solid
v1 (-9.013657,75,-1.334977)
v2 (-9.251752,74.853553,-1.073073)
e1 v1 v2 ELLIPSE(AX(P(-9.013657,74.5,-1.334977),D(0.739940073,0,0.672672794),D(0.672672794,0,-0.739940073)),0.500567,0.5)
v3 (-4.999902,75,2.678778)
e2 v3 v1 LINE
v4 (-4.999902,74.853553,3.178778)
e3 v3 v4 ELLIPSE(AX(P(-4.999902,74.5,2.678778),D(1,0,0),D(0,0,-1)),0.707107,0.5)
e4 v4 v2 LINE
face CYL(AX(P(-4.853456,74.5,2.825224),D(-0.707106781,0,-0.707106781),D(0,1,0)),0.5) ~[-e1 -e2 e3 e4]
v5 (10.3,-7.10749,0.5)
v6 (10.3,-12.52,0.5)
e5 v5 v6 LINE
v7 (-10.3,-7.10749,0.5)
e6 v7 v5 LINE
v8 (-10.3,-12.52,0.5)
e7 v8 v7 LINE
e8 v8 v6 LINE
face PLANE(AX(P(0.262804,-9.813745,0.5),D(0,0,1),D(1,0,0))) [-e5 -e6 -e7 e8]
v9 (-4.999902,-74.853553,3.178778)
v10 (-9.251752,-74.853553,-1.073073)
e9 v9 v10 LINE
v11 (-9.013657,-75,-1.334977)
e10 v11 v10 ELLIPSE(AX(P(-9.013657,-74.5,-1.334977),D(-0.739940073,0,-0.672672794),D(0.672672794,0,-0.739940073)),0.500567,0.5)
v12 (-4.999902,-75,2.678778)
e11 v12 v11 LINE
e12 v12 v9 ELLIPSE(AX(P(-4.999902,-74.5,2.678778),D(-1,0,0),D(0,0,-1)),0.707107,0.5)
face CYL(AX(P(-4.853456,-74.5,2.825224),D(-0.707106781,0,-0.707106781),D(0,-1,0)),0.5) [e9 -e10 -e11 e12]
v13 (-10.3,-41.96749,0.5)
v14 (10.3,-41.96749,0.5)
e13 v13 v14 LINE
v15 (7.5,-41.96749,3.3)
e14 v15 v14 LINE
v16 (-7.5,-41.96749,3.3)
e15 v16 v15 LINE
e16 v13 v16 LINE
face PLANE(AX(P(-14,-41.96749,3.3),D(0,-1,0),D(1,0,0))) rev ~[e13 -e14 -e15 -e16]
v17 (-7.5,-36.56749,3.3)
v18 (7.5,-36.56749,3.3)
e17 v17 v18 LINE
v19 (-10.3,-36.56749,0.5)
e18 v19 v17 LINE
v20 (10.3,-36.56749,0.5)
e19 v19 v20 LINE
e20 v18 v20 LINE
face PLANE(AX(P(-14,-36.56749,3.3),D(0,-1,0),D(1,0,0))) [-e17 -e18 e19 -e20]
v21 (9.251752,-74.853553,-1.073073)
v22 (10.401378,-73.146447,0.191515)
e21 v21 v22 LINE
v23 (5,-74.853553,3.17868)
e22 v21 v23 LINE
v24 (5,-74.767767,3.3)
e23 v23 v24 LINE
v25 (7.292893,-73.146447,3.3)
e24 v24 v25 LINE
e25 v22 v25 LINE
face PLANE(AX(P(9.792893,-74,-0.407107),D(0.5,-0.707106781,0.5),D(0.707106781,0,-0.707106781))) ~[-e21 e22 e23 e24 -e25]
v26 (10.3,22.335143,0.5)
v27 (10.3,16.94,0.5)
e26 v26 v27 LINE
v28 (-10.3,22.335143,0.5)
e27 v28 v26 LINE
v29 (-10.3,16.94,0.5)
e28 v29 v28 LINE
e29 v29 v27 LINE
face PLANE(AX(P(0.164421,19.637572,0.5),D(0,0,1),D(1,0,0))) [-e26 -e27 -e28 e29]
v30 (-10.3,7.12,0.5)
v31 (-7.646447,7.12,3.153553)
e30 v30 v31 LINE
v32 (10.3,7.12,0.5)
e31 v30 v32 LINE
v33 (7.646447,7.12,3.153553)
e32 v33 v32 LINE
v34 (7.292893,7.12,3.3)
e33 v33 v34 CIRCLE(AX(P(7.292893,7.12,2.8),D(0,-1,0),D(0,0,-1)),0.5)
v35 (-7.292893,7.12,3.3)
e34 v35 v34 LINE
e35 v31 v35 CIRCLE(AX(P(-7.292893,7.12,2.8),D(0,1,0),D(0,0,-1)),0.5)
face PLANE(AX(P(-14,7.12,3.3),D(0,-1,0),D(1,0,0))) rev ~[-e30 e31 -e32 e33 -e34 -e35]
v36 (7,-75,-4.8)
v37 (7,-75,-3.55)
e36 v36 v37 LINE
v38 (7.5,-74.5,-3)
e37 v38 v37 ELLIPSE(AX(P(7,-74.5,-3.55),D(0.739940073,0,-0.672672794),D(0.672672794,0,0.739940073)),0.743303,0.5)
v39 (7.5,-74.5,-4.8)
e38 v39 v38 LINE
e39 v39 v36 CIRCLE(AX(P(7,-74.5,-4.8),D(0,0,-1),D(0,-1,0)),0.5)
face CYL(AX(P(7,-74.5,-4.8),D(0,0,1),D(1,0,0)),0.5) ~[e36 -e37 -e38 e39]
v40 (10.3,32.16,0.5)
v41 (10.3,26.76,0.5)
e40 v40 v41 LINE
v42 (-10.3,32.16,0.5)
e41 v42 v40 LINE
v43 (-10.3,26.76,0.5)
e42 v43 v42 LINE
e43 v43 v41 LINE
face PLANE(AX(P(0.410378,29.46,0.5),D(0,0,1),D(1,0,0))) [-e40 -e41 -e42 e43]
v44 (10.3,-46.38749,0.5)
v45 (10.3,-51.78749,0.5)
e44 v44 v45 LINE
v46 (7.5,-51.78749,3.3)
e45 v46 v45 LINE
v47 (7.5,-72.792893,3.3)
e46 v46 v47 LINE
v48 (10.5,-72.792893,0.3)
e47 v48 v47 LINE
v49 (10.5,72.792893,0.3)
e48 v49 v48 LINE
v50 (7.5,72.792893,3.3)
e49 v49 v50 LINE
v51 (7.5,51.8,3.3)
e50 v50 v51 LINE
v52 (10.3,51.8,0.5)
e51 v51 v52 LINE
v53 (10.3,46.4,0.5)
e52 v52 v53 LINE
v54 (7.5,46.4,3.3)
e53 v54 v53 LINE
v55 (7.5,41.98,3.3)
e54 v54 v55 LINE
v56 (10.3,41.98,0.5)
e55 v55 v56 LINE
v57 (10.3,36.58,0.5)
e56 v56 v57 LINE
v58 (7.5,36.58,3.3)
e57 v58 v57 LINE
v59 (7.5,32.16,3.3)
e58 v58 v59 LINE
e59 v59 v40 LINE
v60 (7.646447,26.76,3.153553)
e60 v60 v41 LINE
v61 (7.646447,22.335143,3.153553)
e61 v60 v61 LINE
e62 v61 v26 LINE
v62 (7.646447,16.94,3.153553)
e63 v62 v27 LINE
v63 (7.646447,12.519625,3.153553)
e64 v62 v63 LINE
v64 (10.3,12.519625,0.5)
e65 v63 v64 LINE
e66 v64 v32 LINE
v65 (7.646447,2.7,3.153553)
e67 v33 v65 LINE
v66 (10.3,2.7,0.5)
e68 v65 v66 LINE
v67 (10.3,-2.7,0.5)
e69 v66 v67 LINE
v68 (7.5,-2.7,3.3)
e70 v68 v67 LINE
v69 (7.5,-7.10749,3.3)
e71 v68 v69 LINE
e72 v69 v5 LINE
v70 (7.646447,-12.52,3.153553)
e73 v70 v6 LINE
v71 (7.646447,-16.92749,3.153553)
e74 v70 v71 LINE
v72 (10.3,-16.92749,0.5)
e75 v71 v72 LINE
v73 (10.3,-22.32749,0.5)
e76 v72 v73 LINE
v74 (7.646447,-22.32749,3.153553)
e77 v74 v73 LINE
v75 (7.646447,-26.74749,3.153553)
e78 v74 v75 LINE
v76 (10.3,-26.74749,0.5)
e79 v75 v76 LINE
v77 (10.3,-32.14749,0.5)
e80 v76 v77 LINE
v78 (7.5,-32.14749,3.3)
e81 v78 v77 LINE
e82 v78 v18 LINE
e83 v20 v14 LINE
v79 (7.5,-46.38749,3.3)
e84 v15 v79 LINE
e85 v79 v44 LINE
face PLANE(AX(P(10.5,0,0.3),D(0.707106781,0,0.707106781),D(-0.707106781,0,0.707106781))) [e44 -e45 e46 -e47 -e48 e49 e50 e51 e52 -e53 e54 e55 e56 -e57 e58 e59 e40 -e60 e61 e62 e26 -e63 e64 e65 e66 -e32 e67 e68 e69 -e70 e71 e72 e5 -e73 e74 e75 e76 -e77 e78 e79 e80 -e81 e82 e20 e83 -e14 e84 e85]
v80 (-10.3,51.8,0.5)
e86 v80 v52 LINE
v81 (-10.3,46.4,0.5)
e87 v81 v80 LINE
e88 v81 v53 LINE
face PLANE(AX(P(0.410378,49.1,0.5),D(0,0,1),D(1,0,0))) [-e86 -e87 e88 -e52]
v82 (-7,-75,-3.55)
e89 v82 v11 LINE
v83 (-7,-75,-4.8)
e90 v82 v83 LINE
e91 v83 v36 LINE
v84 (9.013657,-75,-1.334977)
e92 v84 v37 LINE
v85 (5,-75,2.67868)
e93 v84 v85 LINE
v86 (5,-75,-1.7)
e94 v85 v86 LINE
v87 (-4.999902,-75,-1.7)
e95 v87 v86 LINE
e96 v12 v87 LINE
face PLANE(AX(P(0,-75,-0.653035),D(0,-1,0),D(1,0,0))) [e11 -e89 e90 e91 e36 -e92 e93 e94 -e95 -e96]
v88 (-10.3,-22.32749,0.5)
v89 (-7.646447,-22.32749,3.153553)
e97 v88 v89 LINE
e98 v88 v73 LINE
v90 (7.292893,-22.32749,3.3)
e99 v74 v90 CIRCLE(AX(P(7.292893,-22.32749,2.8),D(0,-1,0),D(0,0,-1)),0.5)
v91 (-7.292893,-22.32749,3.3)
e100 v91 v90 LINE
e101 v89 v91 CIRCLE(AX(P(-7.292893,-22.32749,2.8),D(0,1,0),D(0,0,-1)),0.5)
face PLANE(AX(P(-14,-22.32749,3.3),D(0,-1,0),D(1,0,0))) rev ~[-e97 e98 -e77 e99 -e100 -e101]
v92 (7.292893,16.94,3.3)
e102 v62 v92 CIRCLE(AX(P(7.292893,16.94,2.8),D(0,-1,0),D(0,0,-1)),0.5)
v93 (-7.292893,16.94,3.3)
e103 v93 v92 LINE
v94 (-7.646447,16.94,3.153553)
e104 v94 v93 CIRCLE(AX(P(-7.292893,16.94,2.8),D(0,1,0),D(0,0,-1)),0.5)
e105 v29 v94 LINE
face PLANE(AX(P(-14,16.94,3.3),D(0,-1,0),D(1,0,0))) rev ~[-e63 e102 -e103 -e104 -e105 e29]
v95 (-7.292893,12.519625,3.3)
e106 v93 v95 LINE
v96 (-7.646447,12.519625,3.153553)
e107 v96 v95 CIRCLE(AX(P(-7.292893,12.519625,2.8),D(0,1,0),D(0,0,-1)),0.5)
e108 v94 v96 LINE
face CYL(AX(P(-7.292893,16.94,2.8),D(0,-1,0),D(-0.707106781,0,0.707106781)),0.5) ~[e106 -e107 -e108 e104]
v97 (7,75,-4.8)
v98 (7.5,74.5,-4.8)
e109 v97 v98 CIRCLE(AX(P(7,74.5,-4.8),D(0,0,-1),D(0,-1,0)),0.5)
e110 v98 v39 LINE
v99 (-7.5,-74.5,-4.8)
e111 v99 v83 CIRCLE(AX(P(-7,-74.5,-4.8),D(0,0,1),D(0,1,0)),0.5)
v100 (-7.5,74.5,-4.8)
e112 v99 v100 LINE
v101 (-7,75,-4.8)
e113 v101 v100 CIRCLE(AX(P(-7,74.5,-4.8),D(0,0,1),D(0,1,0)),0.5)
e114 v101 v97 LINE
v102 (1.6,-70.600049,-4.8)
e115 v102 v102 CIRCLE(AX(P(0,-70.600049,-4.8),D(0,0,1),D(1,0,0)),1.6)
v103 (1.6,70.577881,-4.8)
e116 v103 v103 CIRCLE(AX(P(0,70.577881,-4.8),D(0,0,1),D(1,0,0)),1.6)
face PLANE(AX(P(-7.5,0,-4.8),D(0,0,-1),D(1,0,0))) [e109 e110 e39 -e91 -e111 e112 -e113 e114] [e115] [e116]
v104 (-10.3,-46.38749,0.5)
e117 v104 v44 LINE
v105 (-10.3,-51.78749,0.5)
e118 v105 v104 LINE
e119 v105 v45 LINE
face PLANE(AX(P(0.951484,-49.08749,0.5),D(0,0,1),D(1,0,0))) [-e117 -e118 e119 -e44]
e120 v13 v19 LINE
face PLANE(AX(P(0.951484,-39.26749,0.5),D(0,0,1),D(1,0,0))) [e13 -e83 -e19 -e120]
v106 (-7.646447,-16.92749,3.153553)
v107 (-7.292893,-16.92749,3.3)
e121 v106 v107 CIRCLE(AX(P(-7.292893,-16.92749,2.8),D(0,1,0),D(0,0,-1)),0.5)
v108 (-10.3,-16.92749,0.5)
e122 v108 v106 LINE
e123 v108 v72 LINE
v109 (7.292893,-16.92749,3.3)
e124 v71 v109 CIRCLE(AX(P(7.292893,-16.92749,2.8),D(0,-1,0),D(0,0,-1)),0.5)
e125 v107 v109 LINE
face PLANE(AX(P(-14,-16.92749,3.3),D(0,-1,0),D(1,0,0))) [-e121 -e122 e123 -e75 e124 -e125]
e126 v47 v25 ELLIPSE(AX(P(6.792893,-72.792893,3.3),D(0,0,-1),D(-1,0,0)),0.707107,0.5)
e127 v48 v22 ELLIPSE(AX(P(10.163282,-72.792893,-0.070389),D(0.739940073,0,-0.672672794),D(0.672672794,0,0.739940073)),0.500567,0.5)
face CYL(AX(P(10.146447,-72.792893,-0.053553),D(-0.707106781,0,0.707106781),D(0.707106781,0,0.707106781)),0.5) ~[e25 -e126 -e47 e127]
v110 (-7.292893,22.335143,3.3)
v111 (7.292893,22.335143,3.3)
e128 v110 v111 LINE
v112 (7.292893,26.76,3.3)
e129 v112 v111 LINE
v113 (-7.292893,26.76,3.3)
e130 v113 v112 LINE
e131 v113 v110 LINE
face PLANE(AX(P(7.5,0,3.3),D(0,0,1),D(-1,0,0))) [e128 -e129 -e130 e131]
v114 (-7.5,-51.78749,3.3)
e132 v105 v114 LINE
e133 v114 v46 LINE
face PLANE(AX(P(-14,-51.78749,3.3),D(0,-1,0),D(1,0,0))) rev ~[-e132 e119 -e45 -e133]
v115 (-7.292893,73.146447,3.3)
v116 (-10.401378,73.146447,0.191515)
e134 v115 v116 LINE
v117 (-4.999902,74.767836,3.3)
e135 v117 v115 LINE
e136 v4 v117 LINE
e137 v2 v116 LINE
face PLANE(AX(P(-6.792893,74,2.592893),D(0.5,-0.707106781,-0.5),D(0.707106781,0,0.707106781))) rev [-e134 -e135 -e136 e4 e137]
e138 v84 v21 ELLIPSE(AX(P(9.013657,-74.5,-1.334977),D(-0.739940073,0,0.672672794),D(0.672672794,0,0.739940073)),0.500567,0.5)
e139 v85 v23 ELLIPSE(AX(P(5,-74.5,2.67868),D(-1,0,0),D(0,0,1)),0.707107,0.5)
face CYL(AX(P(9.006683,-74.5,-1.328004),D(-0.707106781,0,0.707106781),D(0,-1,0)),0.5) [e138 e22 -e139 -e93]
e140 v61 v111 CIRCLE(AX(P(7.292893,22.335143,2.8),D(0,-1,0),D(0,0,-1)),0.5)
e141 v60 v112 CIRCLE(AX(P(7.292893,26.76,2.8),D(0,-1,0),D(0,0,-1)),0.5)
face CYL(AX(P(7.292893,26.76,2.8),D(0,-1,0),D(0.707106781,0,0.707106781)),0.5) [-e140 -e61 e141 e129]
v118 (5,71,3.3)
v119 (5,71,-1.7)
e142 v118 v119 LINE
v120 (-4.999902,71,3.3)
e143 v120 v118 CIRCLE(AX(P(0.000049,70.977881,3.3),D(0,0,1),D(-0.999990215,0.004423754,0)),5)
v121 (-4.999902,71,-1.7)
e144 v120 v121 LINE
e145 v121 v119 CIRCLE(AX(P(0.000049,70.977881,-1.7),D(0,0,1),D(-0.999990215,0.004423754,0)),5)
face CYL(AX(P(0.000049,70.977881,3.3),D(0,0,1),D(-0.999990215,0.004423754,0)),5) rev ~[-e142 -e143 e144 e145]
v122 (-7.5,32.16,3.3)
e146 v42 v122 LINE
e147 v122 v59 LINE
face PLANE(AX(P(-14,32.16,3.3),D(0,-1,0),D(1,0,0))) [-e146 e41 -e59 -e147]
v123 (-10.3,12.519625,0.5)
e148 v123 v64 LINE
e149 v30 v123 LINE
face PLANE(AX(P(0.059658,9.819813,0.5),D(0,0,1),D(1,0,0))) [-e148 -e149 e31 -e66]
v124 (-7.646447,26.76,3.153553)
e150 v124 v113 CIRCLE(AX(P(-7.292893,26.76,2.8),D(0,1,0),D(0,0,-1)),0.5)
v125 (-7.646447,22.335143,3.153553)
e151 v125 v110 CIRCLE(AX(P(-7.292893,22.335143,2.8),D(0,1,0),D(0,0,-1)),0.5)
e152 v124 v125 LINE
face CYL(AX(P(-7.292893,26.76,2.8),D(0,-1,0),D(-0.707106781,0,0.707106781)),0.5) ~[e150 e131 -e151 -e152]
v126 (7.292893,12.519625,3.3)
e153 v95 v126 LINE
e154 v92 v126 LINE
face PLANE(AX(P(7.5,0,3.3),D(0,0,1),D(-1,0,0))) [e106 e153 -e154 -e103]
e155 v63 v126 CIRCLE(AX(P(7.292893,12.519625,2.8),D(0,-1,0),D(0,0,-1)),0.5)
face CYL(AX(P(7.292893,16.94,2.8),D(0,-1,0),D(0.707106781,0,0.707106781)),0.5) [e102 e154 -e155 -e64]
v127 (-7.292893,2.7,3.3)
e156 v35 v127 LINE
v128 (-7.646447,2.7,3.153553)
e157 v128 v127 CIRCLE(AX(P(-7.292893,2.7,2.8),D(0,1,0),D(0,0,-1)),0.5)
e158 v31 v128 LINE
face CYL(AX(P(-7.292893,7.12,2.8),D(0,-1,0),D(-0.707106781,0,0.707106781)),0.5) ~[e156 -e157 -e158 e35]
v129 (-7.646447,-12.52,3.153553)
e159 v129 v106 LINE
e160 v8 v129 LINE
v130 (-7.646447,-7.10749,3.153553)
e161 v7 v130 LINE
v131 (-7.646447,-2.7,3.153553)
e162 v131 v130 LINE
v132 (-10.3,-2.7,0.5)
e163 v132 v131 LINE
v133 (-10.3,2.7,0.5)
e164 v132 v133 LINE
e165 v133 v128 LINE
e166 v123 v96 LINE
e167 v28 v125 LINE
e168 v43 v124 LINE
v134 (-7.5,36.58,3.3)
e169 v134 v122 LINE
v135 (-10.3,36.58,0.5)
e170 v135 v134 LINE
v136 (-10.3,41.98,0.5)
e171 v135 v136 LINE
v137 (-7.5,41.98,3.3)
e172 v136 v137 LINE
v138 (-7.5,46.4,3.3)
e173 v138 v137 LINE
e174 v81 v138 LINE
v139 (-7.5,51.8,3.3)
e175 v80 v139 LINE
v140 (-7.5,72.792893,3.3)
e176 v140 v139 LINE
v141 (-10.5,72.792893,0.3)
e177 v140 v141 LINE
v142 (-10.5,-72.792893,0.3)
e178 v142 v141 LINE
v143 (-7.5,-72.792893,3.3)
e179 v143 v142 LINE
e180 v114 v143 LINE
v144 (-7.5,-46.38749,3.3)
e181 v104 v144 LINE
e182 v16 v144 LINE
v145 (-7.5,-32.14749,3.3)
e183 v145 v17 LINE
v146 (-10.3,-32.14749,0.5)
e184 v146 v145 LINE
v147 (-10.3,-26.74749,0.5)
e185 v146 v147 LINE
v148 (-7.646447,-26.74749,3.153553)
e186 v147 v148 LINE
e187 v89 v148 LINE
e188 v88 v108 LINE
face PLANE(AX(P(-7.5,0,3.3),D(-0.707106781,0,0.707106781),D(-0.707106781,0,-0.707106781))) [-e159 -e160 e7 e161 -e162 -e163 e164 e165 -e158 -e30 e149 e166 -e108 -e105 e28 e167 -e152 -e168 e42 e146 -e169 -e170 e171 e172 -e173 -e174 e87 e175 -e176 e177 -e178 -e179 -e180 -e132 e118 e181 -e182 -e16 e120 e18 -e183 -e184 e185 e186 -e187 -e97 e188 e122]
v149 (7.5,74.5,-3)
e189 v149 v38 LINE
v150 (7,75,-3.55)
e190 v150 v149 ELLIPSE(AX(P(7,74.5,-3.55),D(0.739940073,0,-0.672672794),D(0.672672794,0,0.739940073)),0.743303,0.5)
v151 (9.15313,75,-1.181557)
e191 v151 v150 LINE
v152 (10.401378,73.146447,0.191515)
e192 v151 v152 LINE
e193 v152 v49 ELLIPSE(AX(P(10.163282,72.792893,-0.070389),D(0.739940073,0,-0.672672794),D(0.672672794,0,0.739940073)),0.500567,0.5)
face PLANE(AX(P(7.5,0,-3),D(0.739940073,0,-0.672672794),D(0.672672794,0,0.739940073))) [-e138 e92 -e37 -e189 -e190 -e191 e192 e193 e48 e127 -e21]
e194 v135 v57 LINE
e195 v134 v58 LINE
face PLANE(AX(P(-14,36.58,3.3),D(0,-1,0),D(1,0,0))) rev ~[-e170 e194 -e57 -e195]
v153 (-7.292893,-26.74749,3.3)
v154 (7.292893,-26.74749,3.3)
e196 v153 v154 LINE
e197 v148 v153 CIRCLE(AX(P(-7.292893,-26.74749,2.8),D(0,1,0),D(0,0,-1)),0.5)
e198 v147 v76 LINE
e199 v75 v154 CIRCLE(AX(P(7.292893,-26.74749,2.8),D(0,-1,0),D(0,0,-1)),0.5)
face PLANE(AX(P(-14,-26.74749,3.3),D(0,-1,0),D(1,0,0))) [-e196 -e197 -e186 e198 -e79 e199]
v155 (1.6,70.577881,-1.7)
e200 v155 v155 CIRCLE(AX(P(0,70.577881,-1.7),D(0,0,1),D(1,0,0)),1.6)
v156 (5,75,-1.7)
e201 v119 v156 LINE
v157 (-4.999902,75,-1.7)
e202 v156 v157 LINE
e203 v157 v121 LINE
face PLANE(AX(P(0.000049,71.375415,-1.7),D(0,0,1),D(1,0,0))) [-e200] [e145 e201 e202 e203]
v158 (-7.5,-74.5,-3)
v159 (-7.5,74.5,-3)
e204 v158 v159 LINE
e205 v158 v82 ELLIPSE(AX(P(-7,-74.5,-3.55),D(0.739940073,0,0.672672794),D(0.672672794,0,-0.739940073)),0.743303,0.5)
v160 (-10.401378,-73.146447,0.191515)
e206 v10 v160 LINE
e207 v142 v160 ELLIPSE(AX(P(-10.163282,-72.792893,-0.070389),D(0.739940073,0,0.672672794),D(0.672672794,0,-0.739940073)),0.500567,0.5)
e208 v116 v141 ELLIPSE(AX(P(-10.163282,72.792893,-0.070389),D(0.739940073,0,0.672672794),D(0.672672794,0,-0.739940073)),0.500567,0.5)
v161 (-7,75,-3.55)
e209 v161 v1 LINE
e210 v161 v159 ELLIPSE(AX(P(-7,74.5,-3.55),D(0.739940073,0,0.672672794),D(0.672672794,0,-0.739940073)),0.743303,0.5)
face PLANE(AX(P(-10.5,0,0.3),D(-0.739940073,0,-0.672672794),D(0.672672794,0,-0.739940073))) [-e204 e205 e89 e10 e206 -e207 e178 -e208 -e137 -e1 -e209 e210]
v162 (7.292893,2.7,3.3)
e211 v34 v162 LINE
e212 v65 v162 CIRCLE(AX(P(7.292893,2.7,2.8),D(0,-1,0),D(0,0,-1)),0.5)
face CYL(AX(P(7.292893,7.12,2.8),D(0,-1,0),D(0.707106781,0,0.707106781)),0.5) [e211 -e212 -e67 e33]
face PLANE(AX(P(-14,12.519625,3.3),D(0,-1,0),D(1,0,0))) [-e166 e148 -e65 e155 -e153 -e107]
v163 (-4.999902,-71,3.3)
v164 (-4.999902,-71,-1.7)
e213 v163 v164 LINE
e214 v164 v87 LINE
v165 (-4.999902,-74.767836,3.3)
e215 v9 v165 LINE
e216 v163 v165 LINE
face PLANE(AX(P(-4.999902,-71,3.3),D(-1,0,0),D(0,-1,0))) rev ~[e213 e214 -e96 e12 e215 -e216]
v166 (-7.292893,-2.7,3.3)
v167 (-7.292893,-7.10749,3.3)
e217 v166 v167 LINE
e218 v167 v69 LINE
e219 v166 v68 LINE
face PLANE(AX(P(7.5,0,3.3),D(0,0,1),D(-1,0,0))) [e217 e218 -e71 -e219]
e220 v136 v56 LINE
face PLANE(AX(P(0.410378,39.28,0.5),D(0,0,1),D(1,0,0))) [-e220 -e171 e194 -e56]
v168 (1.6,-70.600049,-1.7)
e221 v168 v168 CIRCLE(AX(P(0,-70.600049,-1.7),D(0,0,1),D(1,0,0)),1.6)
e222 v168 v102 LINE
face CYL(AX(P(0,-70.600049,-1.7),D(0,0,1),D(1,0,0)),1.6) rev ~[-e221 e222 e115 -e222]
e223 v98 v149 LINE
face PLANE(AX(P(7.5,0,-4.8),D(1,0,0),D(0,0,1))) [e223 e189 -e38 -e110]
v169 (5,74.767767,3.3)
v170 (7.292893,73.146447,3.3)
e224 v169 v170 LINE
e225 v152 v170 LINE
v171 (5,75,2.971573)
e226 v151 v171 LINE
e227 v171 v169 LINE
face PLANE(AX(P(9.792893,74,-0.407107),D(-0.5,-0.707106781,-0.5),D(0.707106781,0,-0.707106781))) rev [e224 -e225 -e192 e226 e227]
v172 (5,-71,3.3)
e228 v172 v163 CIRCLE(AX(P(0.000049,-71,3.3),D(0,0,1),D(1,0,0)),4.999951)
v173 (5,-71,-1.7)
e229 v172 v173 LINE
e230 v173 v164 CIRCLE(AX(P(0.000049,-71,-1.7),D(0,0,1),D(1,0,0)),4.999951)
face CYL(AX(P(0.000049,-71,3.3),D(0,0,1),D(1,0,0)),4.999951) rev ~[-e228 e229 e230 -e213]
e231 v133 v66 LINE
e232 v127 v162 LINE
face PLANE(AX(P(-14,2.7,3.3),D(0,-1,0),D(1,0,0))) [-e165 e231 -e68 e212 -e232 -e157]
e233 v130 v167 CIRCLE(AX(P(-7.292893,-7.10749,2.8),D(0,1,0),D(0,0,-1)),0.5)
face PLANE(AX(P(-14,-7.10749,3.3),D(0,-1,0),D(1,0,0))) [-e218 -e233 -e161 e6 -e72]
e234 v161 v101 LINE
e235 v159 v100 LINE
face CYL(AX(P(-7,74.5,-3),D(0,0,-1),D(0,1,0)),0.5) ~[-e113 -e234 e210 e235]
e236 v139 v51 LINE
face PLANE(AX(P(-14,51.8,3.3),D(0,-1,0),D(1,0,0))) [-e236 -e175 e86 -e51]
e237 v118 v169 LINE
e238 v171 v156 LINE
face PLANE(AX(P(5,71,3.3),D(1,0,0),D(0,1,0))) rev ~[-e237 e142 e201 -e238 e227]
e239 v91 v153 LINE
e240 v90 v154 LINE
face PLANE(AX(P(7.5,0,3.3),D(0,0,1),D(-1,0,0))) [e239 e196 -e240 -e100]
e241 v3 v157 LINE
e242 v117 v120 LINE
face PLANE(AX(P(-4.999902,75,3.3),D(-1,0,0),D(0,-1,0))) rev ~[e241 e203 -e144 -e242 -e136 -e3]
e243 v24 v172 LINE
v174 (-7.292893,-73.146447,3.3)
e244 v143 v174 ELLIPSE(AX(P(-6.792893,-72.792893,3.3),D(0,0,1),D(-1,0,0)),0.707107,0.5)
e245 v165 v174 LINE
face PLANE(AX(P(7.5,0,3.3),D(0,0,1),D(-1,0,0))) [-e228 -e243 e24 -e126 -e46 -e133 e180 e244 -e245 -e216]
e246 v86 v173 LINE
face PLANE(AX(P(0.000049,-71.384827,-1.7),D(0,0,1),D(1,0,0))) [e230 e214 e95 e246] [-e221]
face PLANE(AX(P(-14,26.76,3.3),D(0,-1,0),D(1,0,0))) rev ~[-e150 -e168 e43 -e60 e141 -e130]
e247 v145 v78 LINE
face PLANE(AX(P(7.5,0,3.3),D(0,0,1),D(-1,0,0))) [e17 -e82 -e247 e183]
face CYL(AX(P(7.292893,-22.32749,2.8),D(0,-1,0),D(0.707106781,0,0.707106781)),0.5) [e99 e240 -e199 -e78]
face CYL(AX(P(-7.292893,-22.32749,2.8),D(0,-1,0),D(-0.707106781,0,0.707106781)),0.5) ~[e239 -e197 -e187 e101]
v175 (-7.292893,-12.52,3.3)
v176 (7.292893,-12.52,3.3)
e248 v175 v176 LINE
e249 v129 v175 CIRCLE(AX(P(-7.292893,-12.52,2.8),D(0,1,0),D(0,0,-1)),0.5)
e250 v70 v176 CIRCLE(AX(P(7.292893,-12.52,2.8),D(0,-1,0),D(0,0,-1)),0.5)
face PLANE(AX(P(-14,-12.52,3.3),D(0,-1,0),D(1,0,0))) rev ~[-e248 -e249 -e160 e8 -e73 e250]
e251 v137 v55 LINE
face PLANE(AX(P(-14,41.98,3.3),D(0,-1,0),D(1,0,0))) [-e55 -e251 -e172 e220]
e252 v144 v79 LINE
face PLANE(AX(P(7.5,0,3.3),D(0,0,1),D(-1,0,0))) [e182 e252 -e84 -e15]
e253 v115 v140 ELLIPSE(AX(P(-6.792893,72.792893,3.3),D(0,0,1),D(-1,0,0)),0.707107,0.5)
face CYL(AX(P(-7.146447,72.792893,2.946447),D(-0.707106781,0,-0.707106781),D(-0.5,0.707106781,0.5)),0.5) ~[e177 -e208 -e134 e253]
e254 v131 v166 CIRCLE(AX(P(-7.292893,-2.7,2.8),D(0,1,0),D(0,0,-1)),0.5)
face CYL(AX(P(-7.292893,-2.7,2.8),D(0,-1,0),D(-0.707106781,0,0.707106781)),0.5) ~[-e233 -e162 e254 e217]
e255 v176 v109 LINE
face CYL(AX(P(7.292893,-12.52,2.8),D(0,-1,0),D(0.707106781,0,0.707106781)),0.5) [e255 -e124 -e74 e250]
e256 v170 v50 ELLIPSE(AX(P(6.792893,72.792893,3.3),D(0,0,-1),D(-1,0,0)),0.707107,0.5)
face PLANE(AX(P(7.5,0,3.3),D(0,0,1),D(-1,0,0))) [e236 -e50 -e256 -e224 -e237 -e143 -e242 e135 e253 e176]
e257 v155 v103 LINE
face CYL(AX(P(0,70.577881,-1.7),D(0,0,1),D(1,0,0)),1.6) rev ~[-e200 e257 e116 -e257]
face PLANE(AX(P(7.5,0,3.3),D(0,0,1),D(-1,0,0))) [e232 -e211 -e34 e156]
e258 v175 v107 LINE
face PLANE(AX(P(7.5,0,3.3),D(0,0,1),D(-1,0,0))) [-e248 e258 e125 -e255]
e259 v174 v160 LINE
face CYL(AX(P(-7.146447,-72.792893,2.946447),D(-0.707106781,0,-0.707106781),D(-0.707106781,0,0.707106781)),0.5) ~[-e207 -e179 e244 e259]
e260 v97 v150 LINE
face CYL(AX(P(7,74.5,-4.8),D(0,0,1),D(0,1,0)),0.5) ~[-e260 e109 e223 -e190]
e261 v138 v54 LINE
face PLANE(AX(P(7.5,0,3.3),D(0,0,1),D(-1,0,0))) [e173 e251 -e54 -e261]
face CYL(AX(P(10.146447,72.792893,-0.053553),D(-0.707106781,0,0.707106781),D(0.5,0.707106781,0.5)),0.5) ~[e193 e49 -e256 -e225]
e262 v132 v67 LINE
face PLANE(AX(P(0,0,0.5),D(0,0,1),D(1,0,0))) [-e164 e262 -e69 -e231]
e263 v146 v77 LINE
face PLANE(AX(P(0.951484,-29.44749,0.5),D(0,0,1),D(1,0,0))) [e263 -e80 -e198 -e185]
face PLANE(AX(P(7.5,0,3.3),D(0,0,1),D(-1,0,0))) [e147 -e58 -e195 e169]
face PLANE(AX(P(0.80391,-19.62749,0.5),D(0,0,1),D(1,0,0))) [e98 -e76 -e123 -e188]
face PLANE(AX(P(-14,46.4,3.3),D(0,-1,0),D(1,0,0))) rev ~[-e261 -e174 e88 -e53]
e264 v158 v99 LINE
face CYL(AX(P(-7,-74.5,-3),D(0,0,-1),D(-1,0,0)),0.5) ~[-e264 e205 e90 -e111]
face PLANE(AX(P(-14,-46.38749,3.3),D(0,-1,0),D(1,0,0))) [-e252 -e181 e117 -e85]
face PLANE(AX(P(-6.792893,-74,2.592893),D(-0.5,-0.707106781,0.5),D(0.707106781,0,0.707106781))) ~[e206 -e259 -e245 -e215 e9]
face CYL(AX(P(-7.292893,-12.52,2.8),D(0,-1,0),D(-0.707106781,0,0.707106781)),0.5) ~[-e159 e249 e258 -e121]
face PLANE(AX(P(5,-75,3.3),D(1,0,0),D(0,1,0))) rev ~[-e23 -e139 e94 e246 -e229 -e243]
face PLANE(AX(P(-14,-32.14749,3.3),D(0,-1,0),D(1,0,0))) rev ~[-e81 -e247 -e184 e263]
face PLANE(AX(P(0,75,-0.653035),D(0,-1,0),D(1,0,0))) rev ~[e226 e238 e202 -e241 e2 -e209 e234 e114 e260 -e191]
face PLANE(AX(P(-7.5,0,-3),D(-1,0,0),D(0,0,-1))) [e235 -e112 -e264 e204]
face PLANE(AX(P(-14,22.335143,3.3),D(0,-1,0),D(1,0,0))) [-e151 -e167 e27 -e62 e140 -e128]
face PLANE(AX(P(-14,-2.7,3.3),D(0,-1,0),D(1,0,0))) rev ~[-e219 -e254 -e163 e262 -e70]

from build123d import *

# Parameters (mm, degrees)
F1_DEPTH = 75
F2_W     = 28
F2_H     = 5.4
F2_W_2   = 28.1193151165
F2_H_2   = 5.3996254659
F2_W_3   = 28.3288413435
F2_H_3   = 5.3951430639
F2_W_4   = 28.8207556829
F2_W_5   = 28.5256083831
F2_H_4   = 5.4125102987
F2_W_6   = 29.607820116
F2_W_7   = 29.9029674158
F3_DEPTH = 2.8
F5_DEPTH = 5
F6_R     = 1.6
F7_DEPTH = 3.101
F8_SIZE  = 2
F9_R     = 0.5


with BuildPart() as f1:
    # F0 (on Front) → F1 (new body, symmetric)
    with BuildSketch(Plane.XZ):
        Polygon((-7.5, -4.8), (7.5, -4.8), (7.5, -3), (10.5, 0.3), (7.5, 3.3), (-7.5, 3.3), (-10.5, 0.3), (-7.5, -3), align=None)
    extrude(amount=F1_DEPTH, both=True)

    # F2 (on face) → F3 (cut)
    with BuildSketch(Plane.XY.offset(3.3)):
        Rectangle(F2_W, F2_H)
        with Locations((0.0596575582, 9.8198127329)):
            Rectangle(F2_W_2, F2_H_2)
        with Locations((0.1644206718, 19.6375715319)):
            Rectangle(F2_W_3, F2_H_3)
        with Locations((0.4103778414, 29.46)):
            Rectangle(F2_W_4, F2_H)
        with Locations((0.2628041916, -9.8137448507)):
            Rectangle(F2_W_5, F2_H_4)
        with Locations((0.803910058, -19.6274897013)):
            Rectangle(F2_W_6, F2_H)
        with Locations((0.9514837079, -29.4474897013)):
            Rectangle(F2_W_7, F2_H)
        with Locations((0.4103778414, 39.28)):
            Rectangle(F2_W_4, F2_H)
        with Locations((0.4103778414, 49.1)):
            Rectangle(F2_W_4, F2_H)
        with Locations((0.9514837079, -39.2674897013)):
            Rectangle(F2_W_7, F2_H)
        with Locations((0.9514837079, -49.0874897013)):
            Rectangle(F2_W_7, F2_H)
    extrude(amount=-F3_DEPTH, mode=Mode.SUBTRACT)

    # F4 (on face) → F5 (cut)
    with BuildSketch(Plane.XY.offset(3.3)):
        with BuildLine():
            Line((-4.9999021515, -71), (-4.9999021515, -73))
            Line((-4.9999021515, -73), (-4.9999021515, -75))
            Line((-4.9999021515, -75), (5, -75))
            Line((5, -75), (5, -73))
            Line((5, -73), (5, -71))
            ThreePointArc((5, -71), (4.89242e-05, -66.0000489242), (-4.9999021515, -71))
        make_face()
        with BuildLine():
            ThreePointArc((-4.9999021515, 71), (4.89242e-05, 65.9778812301), (5, 71))
            Line((5, 71), (5, 73))
            Line((5, 73), (5, 75))
            Line((5, 75), (-4.9999021515, 75))
            Line((-4.9999021515, 75), (-4.9999021515, 73))
            Line((-4.9999021515, 73), (-4.9999021515, 71))
        make_face()
    extrude(amount=-F5_DEPTH, mode=Mode.SUBTRACT)

    # F6 (on face) → F7 (cut, through all)
    with BuildSketch(Plane.XY.offset(-1.7)):
        with Locations((0, -70.6000489272)):
            Circle(F6_R)
        with Locations((0, 70.5778812331)):
            Circle(F6_R)
    extrude(amount=-F7_DEPTH, mode=Mode.SUBTRACT)

    # F8
    f8_edges = [f1.edges().sort_by_distance(p)[0] for p in [
        (9, 75, 1.8),
        (-9, 75, 1.8),
        (9, -75, 1.8),
        (-9, -75, 1.8),
    ]]
    chamfer(f8_edges, length=F8_SIZE)

    # F9
    f9_edges = [f1.edges().sort_by_distance(p)[0] for p in [
        (-7.5, 24.547572, 3.3),
        (-7.5, 14.729813, 3.3),
        (-7.5, 4.91, 3.3),
        (-7.5, -4.903745, 3.3),
        (-7.5, -14.723745, 3.3),
        (-7.5, -24.53749, 3.3),
        (7.5, -24.53749, 3.3),
        (7.5, -14.723745, 3.3),
        (7.5, 4.91, 3.3),
        (7.5, 14.729813, 3.3),
        (7.5, 24.547572, 3.3),
        (-7.076516, 75, 0.895057),
        (9, 73, 1.8),
        (-9, 73, 1.8),
        (7.076565, -75, 0.895008),
        (9, -73, 1.8),
        (-7.076516, -75, 0.895057),
        (-9, -73, 1.8),
        (-7.5, -75, -3.9),
        (7.5, -75, -3.9),
        (7.5, 75, -3.9),
        (-7.5, 75, -3.9),
    ]]
    fillet(f9_edges, radius=F9_R)


solid = f1.part
